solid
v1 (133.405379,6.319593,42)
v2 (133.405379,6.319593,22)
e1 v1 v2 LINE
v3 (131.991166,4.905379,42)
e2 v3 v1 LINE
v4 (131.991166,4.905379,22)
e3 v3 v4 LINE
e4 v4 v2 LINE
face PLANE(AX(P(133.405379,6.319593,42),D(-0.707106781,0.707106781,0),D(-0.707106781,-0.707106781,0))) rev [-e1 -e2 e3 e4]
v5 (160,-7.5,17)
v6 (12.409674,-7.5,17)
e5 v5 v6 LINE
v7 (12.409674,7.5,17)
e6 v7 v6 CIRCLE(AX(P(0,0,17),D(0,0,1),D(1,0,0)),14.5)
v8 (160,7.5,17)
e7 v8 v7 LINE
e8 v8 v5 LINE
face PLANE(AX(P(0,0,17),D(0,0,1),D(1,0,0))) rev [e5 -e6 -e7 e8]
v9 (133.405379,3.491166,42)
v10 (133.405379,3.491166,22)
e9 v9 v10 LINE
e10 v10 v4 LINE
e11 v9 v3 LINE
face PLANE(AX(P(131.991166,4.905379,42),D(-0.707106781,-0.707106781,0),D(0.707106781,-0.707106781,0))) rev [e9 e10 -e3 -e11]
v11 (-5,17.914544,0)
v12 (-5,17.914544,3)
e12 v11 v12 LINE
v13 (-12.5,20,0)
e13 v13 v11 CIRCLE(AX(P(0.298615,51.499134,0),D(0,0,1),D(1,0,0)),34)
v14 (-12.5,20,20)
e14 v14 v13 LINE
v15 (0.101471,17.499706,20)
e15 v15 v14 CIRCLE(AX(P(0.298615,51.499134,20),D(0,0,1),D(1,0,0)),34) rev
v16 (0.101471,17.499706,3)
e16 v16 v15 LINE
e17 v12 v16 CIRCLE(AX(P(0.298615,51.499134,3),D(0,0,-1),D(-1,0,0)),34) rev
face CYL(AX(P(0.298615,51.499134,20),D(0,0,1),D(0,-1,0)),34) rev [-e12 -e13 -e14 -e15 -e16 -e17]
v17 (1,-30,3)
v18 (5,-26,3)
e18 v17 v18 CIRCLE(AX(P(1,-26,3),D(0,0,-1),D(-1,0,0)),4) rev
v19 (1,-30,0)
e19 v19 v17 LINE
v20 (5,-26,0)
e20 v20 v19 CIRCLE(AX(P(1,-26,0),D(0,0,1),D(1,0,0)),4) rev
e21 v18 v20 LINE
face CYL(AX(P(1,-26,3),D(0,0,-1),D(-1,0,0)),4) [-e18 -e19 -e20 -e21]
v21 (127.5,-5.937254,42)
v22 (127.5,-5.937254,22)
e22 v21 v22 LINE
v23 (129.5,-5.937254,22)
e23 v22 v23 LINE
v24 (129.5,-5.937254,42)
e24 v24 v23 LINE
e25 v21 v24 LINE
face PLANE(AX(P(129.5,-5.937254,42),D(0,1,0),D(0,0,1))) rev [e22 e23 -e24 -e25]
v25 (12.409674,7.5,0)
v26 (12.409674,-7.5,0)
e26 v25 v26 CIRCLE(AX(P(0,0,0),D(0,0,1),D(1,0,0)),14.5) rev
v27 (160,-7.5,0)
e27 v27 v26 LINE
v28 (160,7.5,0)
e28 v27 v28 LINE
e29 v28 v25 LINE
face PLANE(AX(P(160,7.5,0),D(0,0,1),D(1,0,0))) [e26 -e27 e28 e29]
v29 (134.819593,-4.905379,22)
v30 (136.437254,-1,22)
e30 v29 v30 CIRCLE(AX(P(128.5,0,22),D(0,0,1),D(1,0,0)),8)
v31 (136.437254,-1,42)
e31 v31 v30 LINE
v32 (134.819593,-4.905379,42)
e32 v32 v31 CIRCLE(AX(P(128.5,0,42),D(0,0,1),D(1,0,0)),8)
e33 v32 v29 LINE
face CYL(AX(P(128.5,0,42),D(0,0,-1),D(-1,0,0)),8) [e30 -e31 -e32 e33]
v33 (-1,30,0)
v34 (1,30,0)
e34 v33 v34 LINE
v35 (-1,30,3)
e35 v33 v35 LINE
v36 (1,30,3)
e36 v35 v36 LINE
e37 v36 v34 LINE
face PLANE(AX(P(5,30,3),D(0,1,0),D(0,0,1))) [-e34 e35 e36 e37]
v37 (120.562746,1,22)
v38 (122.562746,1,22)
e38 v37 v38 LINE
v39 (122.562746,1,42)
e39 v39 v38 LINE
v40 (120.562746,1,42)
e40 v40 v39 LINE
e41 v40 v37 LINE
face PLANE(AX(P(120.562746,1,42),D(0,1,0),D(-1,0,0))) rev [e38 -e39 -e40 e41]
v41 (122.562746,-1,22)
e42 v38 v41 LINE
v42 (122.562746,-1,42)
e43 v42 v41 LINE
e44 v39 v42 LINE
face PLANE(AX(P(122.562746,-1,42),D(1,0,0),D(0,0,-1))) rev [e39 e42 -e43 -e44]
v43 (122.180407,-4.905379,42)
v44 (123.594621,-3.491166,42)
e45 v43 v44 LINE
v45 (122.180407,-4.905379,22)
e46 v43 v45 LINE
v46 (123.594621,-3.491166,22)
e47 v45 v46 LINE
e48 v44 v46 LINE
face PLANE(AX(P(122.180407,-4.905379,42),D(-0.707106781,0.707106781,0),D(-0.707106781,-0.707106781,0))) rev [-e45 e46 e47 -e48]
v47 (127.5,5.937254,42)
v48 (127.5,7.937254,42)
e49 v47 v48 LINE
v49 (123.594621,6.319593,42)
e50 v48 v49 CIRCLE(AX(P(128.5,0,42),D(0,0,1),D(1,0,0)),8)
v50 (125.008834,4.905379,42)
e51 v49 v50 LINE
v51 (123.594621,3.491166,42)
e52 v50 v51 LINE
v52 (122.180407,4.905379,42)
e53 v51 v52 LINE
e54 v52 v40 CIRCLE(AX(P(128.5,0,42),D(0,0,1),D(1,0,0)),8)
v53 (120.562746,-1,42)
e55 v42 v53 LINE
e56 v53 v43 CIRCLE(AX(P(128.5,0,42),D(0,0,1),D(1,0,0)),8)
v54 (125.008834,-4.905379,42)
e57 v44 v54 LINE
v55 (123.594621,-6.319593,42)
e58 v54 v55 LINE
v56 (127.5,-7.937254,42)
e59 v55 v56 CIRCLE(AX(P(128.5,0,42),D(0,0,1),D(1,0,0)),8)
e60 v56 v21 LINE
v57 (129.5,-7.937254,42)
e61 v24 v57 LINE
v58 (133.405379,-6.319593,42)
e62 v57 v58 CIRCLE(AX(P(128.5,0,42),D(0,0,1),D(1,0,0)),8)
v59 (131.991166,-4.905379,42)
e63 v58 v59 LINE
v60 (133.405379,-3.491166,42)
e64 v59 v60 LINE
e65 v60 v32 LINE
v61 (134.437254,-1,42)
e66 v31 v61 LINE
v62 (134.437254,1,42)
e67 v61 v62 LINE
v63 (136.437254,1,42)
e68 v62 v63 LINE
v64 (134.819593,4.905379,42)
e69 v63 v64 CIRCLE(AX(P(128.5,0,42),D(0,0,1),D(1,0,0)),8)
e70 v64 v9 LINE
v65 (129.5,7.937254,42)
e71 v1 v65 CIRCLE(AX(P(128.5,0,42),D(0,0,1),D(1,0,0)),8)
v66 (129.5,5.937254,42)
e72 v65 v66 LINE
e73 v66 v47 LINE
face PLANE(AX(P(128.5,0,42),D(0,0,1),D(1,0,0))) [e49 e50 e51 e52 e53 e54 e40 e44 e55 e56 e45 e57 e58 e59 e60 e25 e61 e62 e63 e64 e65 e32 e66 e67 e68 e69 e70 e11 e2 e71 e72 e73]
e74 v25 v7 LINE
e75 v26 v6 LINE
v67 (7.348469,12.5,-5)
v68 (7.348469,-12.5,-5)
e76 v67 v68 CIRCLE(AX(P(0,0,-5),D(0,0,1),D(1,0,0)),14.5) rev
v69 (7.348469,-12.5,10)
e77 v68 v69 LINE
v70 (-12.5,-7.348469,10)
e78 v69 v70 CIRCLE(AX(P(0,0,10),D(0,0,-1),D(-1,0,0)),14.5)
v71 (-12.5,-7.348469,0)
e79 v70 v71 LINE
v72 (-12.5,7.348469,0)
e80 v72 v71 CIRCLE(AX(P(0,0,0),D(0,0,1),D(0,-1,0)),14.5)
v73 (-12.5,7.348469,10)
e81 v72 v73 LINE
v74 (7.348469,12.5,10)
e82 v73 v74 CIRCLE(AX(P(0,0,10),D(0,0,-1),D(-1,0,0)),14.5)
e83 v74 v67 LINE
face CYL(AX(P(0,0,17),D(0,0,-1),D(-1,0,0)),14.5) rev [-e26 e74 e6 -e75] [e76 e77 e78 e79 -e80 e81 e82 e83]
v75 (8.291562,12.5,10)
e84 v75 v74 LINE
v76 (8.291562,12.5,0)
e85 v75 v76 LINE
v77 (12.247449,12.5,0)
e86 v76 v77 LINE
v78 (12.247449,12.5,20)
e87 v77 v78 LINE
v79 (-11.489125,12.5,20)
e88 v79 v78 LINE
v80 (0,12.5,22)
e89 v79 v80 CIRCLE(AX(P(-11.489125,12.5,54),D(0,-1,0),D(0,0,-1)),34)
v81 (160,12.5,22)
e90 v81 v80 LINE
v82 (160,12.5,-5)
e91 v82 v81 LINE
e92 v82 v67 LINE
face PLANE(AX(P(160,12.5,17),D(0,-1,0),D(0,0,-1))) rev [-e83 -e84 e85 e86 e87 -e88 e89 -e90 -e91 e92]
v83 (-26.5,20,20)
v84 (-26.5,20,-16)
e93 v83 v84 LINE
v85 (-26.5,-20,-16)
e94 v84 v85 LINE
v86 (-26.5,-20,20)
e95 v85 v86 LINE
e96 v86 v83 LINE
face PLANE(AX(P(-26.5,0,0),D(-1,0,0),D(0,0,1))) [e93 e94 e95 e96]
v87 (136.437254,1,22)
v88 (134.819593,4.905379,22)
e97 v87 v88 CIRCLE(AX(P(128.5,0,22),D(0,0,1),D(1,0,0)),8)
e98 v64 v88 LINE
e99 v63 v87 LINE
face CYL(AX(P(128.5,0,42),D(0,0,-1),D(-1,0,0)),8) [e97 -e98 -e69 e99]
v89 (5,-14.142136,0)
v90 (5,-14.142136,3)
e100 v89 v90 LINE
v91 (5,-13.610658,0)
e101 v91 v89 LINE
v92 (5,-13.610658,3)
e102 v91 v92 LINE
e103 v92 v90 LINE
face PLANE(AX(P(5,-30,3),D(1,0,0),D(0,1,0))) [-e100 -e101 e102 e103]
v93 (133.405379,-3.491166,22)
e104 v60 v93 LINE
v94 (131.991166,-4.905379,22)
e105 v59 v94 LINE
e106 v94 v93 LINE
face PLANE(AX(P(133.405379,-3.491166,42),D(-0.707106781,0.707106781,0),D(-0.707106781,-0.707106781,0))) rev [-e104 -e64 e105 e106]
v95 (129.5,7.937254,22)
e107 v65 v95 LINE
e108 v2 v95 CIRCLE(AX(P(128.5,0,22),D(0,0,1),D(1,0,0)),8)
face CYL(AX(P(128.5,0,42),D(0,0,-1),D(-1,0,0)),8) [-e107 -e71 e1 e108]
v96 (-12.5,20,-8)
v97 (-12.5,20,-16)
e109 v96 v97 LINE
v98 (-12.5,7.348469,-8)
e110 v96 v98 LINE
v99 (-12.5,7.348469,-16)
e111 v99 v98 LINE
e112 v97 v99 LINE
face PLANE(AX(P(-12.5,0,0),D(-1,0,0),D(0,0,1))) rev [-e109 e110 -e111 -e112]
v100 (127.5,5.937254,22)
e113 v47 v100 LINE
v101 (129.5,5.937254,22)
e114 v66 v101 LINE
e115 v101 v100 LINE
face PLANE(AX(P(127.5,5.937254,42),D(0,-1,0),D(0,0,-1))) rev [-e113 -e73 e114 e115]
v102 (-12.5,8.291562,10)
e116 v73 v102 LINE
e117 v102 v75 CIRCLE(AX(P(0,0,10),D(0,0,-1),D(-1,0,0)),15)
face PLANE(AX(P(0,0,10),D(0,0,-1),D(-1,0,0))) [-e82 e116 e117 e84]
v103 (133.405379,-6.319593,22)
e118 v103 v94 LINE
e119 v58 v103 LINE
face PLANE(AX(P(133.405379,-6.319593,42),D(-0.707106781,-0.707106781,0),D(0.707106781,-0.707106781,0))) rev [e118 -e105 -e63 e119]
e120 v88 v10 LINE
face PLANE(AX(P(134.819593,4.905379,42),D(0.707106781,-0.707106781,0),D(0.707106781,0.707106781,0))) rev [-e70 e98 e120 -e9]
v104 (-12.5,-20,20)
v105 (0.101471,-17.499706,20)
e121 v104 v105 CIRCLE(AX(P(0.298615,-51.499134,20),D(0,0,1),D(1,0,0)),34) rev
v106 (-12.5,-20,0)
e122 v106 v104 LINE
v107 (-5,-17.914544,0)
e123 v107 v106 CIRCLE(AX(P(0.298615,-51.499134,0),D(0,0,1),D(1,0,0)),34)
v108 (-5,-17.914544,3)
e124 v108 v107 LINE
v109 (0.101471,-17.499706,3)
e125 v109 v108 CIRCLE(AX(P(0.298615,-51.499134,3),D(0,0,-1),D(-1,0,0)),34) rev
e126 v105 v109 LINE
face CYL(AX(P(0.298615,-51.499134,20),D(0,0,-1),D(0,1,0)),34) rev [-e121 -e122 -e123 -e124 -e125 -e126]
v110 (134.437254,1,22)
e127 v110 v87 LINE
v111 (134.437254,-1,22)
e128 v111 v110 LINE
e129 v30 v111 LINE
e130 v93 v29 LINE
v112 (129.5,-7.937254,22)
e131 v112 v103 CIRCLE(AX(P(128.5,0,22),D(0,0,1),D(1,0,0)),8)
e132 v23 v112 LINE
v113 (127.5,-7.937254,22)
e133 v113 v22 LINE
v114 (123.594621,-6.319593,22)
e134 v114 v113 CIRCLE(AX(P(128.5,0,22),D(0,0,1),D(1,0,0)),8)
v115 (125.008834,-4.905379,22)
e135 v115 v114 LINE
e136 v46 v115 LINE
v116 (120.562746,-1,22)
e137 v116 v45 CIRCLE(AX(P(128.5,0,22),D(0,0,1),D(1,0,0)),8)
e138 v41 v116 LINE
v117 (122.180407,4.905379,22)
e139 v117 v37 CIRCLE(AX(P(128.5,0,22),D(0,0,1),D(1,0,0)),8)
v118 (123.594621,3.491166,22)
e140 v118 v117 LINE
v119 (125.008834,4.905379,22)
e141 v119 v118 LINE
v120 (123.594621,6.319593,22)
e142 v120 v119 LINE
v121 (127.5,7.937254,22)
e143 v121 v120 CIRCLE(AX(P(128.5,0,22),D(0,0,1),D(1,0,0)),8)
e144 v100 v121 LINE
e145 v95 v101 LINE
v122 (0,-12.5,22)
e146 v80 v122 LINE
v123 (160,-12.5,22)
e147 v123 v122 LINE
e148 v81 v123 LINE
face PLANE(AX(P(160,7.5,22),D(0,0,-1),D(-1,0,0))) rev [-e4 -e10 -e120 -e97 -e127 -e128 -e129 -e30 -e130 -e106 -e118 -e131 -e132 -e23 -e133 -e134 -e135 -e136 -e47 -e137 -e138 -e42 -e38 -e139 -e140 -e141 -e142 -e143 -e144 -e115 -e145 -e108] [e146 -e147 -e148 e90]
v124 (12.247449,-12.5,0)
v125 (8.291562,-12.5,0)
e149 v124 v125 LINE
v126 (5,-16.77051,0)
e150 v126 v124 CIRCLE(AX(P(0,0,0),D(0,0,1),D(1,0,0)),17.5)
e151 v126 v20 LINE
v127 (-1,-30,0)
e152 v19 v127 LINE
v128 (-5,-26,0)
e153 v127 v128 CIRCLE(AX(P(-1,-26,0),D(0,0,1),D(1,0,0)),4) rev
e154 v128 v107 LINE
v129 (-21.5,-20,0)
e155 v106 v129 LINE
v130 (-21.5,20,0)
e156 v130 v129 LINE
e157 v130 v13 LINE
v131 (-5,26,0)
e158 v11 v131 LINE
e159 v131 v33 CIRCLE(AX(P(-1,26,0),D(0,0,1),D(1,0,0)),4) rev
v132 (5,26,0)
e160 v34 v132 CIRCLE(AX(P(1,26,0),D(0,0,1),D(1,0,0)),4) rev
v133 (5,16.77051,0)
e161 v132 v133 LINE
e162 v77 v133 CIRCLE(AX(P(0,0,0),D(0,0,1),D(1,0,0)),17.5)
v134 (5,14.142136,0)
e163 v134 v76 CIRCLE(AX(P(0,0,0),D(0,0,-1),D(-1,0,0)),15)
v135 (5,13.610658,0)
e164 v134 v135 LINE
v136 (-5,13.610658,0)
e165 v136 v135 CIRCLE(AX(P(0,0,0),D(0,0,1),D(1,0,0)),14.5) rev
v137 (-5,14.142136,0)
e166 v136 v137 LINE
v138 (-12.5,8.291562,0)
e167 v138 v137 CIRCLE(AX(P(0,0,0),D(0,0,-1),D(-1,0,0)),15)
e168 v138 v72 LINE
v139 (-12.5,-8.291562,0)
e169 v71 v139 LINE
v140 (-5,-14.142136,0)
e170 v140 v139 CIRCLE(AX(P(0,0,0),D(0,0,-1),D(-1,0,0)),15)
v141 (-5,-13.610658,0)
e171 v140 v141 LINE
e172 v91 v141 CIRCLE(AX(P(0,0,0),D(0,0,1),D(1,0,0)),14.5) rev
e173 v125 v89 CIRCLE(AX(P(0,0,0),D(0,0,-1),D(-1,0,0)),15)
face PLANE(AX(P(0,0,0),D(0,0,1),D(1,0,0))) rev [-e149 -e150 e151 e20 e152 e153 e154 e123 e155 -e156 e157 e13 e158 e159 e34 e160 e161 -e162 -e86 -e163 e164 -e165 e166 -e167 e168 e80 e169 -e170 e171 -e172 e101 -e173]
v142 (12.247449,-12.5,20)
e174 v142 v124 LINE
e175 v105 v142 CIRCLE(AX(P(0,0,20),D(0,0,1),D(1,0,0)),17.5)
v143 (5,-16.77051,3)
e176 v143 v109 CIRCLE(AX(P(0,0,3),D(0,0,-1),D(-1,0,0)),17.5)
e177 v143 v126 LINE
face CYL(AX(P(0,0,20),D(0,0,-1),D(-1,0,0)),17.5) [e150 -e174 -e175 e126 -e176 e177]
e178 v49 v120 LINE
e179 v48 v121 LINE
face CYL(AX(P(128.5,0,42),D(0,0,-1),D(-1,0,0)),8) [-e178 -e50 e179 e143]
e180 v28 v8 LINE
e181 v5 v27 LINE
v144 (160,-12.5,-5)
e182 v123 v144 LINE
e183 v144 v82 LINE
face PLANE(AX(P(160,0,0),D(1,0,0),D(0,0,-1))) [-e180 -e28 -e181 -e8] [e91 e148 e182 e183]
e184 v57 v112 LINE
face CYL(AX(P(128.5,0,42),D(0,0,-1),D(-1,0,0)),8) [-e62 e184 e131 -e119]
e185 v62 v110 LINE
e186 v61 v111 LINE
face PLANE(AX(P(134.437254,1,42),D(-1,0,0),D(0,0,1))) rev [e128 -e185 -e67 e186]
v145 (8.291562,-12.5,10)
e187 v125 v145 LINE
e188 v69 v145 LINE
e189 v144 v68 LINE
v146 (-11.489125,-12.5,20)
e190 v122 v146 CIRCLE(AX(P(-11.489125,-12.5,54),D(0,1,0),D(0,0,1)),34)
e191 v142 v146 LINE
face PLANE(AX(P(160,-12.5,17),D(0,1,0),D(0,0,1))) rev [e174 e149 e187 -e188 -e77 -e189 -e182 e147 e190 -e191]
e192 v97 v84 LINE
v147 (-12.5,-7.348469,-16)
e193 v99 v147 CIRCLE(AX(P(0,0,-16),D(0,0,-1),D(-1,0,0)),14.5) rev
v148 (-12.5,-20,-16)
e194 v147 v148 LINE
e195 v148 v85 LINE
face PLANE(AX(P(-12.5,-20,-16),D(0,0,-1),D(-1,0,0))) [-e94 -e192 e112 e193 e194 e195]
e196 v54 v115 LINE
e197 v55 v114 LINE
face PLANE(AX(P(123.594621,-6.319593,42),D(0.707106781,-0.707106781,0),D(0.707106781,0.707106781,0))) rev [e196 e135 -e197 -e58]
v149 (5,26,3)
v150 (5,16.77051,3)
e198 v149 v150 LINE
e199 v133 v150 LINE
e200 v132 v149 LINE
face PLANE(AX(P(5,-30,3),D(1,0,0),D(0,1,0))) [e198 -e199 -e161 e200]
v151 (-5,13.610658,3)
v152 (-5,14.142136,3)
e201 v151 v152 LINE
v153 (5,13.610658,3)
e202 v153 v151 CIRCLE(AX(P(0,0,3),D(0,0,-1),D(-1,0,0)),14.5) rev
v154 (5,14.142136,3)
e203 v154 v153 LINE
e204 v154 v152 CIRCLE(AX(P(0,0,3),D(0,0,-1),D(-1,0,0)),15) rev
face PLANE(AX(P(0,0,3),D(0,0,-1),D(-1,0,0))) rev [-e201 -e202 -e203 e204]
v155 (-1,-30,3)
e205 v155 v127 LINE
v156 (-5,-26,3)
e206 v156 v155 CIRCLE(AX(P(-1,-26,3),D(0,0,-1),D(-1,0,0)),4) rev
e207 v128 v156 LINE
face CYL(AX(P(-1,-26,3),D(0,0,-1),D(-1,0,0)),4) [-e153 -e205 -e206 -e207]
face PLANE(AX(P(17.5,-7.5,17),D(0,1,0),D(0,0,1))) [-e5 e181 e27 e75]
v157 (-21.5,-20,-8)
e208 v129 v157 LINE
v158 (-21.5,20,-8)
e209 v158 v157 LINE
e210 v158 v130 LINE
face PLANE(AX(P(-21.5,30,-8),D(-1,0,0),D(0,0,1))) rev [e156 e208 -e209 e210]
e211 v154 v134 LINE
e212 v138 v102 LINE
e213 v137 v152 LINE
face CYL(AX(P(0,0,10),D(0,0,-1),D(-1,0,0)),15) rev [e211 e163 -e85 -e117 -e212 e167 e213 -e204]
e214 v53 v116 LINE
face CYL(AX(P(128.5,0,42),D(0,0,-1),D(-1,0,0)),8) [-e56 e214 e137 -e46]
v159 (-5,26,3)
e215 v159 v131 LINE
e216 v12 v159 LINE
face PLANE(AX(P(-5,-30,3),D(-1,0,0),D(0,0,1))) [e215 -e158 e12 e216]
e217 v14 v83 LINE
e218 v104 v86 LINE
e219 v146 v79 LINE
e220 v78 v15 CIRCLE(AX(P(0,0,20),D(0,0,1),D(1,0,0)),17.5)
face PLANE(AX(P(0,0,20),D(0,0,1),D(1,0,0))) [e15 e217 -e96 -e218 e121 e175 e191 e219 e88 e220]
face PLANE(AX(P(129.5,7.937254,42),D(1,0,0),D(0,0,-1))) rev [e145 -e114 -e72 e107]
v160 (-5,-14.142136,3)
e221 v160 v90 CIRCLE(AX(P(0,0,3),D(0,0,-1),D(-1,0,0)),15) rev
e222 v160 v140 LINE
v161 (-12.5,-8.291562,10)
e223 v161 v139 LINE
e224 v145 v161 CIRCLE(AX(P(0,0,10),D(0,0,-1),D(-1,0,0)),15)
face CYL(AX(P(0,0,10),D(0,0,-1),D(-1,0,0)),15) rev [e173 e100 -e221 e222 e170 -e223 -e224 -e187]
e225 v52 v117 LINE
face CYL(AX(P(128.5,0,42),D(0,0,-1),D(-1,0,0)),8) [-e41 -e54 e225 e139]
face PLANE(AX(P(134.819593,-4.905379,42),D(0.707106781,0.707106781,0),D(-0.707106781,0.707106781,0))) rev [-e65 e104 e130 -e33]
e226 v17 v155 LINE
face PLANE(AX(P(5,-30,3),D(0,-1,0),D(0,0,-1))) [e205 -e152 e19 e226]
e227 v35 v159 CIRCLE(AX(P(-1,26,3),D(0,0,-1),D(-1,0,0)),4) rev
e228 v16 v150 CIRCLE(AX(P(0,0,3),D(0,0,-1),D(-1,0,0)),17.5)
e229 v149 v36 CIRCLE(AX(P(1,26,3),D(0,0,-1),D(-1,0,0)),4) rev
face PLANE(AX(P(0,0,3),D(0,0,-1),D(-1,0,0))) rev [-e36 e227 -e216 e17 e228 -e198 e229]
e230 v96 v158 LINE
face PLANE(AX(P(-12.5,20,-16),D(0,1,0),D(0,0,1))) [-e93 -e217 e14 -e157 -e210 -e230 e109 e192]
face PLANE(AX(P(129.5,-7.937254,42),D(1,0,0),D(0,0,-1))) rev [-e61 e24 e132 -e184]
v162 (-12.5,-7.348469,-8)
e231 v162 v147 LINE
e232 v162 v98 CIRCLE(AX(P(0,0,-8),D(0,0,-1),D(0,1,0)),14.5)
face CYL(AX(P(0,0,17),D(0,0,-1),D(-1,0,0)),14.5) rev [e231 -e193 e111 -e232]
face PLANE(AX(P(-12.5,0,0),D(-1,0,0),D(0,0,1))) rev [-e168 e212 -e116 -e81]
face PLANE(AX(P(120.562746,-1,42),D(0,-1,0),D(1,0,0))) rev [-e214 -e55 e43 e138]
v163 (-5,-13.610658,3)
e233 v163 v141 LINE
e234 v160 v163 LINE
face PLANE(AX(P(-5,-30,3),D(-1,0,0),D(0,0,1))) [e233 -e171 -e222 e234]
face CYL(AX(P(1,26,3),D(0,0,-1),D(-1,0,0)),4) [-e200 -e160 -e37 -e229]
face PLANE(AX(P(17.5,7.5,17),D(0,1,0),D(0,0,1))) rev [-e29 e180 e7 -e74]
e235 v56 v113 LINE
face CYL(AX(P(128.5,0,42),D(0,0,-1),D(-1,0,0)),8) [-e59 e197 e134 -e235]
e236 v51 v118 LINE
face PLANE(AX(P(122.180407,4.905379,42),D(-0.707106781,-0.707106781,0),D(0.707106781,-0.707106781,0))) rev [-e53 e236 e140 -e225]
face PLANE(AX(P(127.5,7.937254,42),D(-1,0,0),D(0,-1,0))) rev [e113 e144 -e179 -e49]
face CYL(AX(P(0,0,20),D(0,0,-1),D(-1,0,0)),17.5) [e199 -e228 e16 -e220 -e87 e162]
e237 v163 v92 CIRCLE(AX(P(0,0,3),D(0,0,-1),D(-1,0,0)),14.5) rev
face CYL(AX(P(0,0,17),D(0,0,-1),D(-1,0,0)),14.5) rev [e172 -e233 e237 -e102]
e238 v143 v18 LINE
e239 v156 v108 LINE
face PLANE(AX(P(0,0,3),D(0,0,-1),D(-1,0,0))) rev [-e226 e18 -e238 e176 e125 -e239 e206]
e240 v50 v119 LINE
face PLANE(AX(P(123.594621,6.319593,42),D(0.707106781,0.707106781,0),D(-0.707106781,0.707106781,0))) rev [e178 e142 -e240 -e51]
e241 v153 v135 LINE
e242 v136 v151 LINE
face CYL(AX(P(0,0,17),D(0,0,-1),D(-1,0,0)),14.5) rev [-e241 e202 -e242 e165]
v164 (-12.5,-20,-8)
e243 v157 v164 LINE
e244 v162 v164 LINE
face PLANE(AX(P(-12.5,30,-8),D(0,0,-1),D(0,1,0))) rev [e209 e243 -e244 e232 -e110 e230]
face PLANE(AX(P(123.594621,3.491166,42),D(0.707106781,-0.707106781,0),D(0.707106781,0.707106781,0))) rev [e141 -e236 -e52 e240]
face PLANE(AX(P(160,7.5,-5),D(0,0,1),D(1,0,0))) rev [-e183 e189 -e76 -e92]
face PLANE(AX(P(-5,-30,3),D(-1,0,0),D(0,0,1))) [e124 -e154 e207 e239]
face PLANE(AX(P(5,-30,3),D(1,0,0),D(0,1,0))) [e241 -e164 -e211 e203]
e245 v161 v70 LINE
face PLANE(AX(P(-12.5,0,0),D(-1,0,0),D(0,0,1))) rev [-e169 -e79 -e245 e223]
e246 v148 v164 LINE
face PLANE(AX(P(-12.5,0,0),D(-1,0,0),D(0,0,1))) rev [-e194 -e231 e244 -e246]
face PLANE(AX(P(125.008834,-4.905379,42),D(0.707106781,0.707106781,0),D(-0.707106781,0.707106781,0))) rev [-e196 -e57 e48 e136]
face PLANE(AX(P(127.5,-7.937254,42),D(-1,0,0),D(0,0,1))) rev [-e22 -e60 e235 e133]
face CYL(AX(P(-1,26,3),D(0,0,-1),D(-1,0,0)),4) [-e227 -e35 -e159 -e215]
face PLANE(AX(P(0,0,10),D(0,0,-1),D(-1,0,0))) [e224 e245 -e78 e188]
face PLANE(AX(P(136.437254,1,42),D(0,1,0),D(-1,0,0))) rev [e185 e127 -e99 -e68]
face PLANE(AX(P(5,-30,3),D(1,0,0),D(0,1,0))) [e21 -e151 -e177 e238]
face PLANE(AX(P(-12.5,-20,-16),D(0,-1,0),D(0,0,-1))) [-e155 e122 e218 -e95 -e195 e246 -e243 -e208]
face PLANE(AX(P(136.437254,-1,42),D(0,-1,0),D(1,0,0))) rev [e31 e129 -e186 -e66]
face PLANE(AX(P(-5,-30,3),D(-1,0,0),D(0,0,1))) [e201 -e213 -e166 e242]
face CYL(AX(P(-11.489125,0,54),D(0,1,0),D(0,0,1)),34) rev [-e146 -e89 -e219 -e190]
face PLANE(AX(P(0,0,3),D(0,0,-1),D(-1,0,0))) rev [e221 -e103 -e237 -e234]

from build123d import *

# Parameters (mm, degrees)
SKETCH3_R                = 15
CUT_EXTRUDE1_DEPTH       = 10
SKETCH4_W                = 17
SKETCH4_H                = 15
CUT_EXTRUDE2_DEPTH       = 32.819805153
SKETCH4_4_W              = 27
SKETCH4_4_H              = 25
SKETCH4_4_W_2            = 17
SKETCH4_4_H_2            = 15
EXTRUDE_THIN2_DEPTH      = 160
SKETCH5_W                = 10
SKETCH5_H                = 60
BOSS_EXTRUDE1_DEPTH      = 3
FILLET1_R                = 4
BOSS_EXTRUDE5_DEPTH      = 9
BOSS_EXTRUDE5_DEPTH_BACK = 5
SKETCH6_W                = 36
SKETCH6_H                = 40
CUT_EXTRUDE4_DEPTH       = 17
CUT_EXTRUDE4_DEPTH_BACK  = 160
SKETCH2_3_R              = 14.5
CUT_EXTRUDE5_DEPTH       = 170.068033643
CUT_EXTRUDE5_DEPTH_BACK  = 170.068033643
SKETCH8_W                = 9
SKETCH8_H                = 8
FILLET2_R                = 34
FILLET3_R                = 34
BOSS_EXTRUDE6_DEPTH      = 20


with BuildPart() as part:
    # Extrude-Thin1: read off the stored shape, not the designer's step
    # Extrude-Thin1 outline → Extrude-Thin1 (revolve)
    with BuildSketch(Plane.XZ):
        Polygon((17.5, 20), (0, 20), (0, 17), (14.5, 17), (14.5, 3), (0, 3), (0, 0), (17.5, 0), align=None)
    revolve(axis=Axis((0, 0, 0), (0, 0, 1)))

    # Sketch3 → Cut-Extrude1 (cut)
    with BuildSketch(Plane(origin=(0, 0, 0), x_dir=(-1, 0, 0), z_dir=(0, 0, -1))):
        Circle(SKETCH3_R)
    extrude(amount=-CUT_EXTRUDE1_DEPTH, mode=Mode.SUBTRACT)

    # Sketch4 → Cut-Extrude2 (cut, through all)
    with BuildSketch(Plane(origin=(0, 0, 0), x_dir=(0, 0, -1), z_dir=(1, 0, 0))):
        with Locations((-8.5, 0)):
            Rectangle(SKETCH4_W, SKETCH4_H)
    extrude(amount=CUT_EXTRUDE2_DEPTH, mode=Mode.SUBTRACT)

    # Sketch4<4> → Extrude-Thin2 (add)
    with BuildSketch(Plane(origin=(0, 0, 0), x_dir=(0, 0, -1), z_dir=(1, 0, 0))):
        with Locations((-8.5, 0)):
            Rectangle(SKETCH4_4_W, SKETCH4_4_H)
        with Locations((-8.5, 0)):
            Rectangle(SKETCH4_4_W_2, SKETCH4_4_H_2, mode=Mode.SUBTRACT)
    extrude(amount=EXTRUDE_THIN2_DEPTH)

    # Sketch5 → Boss-Extrude1 (add)
    with BuildSketch(Plane(origin=(0, 0, 0), x_dir=(-1, 0, 0), z_dir=(0, 0, -1))):
        Rectangle(SKETCH5_W, SKETCH5_H)
    extrude(amount=-BOSS_EXTRUDE1_DEPTH)

    # Fillet1
    fillet1_edges = [part.edges().sort_by_distance(p)[0] for p in [
        (-5, 30, 1.5),
        (5, -30, 1.5),
        (-5, -30, 1.5),
        (5, 30, 1.5),
    ]]
    fillet(fillet1_edges, radius=FILLET1_R)

    # Sketch6 → Boss-Extrude5 (add, two sides: drawn at the far end of the back side and taken through both)
    with BuildSketch(Plane.ZY.offset(17.5).offset(-BOSS_EXTRUDE5_DEPTH_BACK)):
        with Locations((2, 0)):
            Rectangle(SKETCH6_W, SKETCH6_H)
    extrude(amount=BOSS_EXTRUDE5_DEPTH + BOSS_EXTRUDE5_DEPTH_BACK)

    # Sketch2<3> → Cut-Extrude4 (cut, two sides: drawn at the far end of the back side and taken through both)
    with BuildSketch(Plane.XY.offset(-CUT_EXTRUDE4_DEPTH_BACK)):
        with Locations(Location((0, 0, 0), (0, 0, 149.549685979))):
            Circle(SKETCH2_3_R)
    extrude(amount=CUT_EXTRUDE4_DEPTH + CUT_EXTRUDE4_DEPTH_BACK, mode=Mode.SUBTRACT)

    # Sketch8 → Cut-Extrude5 (cut, two sides: drawn at the far end of the back side and taken through both)
    with BuildSketch(Plane.XZ.offset(20).offset(-CUT_EXTRUDE5_DEPTH_BACK)):
        with Locations((-17, -4)):
            Rectangle(SKETCH8_W, SKETCH8_H)
    extrude(amount=CUT_EXTRUDE5_DEPTH + CUT_EXTRUDE5_DEPTH_BACK, mode=Mode.SUBTRACT)

    # Fillet2
    # the kernel refuses this fillet: 34 mm, written as the material it adds along each edge
    with BuildSketch(Plane(origin=(-12.5, -12.247448714, 0), x_dir=(0.923034160497627, -0.3847179987399096, 0), z_dir=(0, 0, 1))) as fillet2_piece_1:
        with BuildLine():
            CenterArc((26.914388587, -31.306789136), FILLET2_R, 112.958457005, 21.780491129)
            Line((2.982546016, -7.155869668), (2.503909164, -6.672851279))
            ThreePointArc((2.503909164, -6.672851279), (0.863609779, -3.839543073), (-0.627663229, -0.261608239))
            Line((-0.627663229, -0.261608239), (0.26524325, 0.626135783))
            ThreePointArc((0.26524325, 0.626135783), (6.826113047, -0.706211474), (13.386982845, 0.626135783))
            Line((13.386982845, 0.626135783), (13.652226095, 0))
        make_face()
    extrude(amount=20)
    with BuildSketch(Plane(origin=(-12.5, 12.247448714, 0), x_dir=(0, 1, 0), z_dir=(0, 0, 1))) as fillet2_piece_2:
        with BuildLine():
            CenterArc((39.251685543, -12.798614811), FILLET2_R, 157.887286265, 21.780491129)
            Line((5.252257101, -12.601471052), (4.572268533, -12.597528177))
            ThreePointArc((4.572268533, -12.597528177), (3.277985866, -6.029043261), (-0.475900864, -0.485714286))
            Line((-0.475900864, -0.485714286), (0, 0.68))
            ThreePointArc((0, 0.68), (3.876275643, 0.68), (7.122568601, 0.255972296))
            Line((7.122568601, 0.255972296), (7.752551286, 0))
        make_face()
    extrude(amount=20)

    # Fillet3
    # the kernel refuses this fillet: 34 mm, written as the material it adds along each edge
    with BuildSketch(Plane(origin=(0, 12.5, 20), x_dir=(-1, 0, 0), z_dir=(0, -1, 0))) as fillet3_piece_1:
        with BuildLine():
            CenterArc((11.489125293, -34), FILLET3_R, 90, 19.749922796)
            Line((0, -2), (0, 0))
            Line((0, 0), (11.489125293, 0))
        make_face()
    extrude(amount=25)

    # Sketch9 → Boss-Extrude6 (add)
    with BuildSketch(Plane.XY.offset(22)):
        with BuildLine():
            Line((136.437253933, 1), (134.437253933, 1))
            Line((134.437253933, 1), (134.437253933, -1))
            Line((134.437253933, -1), (136.437253933, -1))
            ThreePointArc((136.437253933, -1), (135.89103626, -3.061467459), (134.819592861, -4.905379299))
            Line((134.819592861, -4.905379299), (133.405379299, -3.491165737))
            Line((133.405379299, -3.491165737), (131.991165737, -4.905379299))
            Line((131.991165737, -4.905379299), (133.405379299, -6.319592861))
            ThreePointArc((133.405379299, -6.319592861), (131.561467459, -7.39103626), (129.5, -7.937253933))
            Line((129.5, -7.937253933), (129.5, -5.937253933))
            Line((129.5, -5.937253933), (127.5, -5.937253933))
            Line((127.5, -5.937253933), (127.5, -7.937253933))
            ThreePointArc((127.5, -7.937253933), (125.438532541, -7.39103626), (123.594620701, -6.319592861))
            Line((123.594620701, -6.319592861), (125.008834263, -4.905379299))
            Line((125.008834263, -4.905379299), (123.594620701, -3.491165737))
            Line((123.594620701, -3.491165737), (122.180407139, -4.905379299))
            ThreePointArc((122.180407139, -4.905379299), (121.10896374, -3.061467459), (120.562746067, -1))
            Line((120.562746067, -1), (122.562746067, -1))
            Line((122.562746067, -1), (122.562746067, 1))
            Line((122.562746067, 1), (120.562746067, 1))
            ThreePointArc((120.562746067, 1), (121.10896374, 3.061467459), (122.180407139, 4.905379299))
            Line((122.180407139, 4.905379299), (123.594620701, 3.491165737))
            Line((123.594620701, 3.491165737), (125.008834263, 4.905379299))
            Line((125.008834263, 4.905379299), (123.594620701, 6.319592861))
            ThreePointArc((123.594620701, 6.319592861), (125.438532541, 7.39103626), (127.5, 7.937253933))
            Line((127.5, 7.937253933), (127.5, 5.937253933))
            Line((127.5, 5.937253933), (129.5, 5.937253933))
            Line((129.5, 5.937253933), (129.5, 7.937253933))
            ThreePointArc((129.5, 7.937253933), (131.561467459, 7.39103626), (133.405379299, 6.319592861))
            Line((133.405379299, 6.319592861), (131.991165737, 4.905379299))
            Line((131.991165737, 4.905379299), (133.405379299, 3.491165737))
            Line((133.405379299, 3.491165737), (134.819592861, 4.905379299))
            ThreePointArc((134.819592861, 4.905379299), (135.89103626, 3.061467459), (136.437253933, 1))
        make_face()
    extrude(amount=BOSS_EXTRUDE6_DEPTH)


solid = part.part
